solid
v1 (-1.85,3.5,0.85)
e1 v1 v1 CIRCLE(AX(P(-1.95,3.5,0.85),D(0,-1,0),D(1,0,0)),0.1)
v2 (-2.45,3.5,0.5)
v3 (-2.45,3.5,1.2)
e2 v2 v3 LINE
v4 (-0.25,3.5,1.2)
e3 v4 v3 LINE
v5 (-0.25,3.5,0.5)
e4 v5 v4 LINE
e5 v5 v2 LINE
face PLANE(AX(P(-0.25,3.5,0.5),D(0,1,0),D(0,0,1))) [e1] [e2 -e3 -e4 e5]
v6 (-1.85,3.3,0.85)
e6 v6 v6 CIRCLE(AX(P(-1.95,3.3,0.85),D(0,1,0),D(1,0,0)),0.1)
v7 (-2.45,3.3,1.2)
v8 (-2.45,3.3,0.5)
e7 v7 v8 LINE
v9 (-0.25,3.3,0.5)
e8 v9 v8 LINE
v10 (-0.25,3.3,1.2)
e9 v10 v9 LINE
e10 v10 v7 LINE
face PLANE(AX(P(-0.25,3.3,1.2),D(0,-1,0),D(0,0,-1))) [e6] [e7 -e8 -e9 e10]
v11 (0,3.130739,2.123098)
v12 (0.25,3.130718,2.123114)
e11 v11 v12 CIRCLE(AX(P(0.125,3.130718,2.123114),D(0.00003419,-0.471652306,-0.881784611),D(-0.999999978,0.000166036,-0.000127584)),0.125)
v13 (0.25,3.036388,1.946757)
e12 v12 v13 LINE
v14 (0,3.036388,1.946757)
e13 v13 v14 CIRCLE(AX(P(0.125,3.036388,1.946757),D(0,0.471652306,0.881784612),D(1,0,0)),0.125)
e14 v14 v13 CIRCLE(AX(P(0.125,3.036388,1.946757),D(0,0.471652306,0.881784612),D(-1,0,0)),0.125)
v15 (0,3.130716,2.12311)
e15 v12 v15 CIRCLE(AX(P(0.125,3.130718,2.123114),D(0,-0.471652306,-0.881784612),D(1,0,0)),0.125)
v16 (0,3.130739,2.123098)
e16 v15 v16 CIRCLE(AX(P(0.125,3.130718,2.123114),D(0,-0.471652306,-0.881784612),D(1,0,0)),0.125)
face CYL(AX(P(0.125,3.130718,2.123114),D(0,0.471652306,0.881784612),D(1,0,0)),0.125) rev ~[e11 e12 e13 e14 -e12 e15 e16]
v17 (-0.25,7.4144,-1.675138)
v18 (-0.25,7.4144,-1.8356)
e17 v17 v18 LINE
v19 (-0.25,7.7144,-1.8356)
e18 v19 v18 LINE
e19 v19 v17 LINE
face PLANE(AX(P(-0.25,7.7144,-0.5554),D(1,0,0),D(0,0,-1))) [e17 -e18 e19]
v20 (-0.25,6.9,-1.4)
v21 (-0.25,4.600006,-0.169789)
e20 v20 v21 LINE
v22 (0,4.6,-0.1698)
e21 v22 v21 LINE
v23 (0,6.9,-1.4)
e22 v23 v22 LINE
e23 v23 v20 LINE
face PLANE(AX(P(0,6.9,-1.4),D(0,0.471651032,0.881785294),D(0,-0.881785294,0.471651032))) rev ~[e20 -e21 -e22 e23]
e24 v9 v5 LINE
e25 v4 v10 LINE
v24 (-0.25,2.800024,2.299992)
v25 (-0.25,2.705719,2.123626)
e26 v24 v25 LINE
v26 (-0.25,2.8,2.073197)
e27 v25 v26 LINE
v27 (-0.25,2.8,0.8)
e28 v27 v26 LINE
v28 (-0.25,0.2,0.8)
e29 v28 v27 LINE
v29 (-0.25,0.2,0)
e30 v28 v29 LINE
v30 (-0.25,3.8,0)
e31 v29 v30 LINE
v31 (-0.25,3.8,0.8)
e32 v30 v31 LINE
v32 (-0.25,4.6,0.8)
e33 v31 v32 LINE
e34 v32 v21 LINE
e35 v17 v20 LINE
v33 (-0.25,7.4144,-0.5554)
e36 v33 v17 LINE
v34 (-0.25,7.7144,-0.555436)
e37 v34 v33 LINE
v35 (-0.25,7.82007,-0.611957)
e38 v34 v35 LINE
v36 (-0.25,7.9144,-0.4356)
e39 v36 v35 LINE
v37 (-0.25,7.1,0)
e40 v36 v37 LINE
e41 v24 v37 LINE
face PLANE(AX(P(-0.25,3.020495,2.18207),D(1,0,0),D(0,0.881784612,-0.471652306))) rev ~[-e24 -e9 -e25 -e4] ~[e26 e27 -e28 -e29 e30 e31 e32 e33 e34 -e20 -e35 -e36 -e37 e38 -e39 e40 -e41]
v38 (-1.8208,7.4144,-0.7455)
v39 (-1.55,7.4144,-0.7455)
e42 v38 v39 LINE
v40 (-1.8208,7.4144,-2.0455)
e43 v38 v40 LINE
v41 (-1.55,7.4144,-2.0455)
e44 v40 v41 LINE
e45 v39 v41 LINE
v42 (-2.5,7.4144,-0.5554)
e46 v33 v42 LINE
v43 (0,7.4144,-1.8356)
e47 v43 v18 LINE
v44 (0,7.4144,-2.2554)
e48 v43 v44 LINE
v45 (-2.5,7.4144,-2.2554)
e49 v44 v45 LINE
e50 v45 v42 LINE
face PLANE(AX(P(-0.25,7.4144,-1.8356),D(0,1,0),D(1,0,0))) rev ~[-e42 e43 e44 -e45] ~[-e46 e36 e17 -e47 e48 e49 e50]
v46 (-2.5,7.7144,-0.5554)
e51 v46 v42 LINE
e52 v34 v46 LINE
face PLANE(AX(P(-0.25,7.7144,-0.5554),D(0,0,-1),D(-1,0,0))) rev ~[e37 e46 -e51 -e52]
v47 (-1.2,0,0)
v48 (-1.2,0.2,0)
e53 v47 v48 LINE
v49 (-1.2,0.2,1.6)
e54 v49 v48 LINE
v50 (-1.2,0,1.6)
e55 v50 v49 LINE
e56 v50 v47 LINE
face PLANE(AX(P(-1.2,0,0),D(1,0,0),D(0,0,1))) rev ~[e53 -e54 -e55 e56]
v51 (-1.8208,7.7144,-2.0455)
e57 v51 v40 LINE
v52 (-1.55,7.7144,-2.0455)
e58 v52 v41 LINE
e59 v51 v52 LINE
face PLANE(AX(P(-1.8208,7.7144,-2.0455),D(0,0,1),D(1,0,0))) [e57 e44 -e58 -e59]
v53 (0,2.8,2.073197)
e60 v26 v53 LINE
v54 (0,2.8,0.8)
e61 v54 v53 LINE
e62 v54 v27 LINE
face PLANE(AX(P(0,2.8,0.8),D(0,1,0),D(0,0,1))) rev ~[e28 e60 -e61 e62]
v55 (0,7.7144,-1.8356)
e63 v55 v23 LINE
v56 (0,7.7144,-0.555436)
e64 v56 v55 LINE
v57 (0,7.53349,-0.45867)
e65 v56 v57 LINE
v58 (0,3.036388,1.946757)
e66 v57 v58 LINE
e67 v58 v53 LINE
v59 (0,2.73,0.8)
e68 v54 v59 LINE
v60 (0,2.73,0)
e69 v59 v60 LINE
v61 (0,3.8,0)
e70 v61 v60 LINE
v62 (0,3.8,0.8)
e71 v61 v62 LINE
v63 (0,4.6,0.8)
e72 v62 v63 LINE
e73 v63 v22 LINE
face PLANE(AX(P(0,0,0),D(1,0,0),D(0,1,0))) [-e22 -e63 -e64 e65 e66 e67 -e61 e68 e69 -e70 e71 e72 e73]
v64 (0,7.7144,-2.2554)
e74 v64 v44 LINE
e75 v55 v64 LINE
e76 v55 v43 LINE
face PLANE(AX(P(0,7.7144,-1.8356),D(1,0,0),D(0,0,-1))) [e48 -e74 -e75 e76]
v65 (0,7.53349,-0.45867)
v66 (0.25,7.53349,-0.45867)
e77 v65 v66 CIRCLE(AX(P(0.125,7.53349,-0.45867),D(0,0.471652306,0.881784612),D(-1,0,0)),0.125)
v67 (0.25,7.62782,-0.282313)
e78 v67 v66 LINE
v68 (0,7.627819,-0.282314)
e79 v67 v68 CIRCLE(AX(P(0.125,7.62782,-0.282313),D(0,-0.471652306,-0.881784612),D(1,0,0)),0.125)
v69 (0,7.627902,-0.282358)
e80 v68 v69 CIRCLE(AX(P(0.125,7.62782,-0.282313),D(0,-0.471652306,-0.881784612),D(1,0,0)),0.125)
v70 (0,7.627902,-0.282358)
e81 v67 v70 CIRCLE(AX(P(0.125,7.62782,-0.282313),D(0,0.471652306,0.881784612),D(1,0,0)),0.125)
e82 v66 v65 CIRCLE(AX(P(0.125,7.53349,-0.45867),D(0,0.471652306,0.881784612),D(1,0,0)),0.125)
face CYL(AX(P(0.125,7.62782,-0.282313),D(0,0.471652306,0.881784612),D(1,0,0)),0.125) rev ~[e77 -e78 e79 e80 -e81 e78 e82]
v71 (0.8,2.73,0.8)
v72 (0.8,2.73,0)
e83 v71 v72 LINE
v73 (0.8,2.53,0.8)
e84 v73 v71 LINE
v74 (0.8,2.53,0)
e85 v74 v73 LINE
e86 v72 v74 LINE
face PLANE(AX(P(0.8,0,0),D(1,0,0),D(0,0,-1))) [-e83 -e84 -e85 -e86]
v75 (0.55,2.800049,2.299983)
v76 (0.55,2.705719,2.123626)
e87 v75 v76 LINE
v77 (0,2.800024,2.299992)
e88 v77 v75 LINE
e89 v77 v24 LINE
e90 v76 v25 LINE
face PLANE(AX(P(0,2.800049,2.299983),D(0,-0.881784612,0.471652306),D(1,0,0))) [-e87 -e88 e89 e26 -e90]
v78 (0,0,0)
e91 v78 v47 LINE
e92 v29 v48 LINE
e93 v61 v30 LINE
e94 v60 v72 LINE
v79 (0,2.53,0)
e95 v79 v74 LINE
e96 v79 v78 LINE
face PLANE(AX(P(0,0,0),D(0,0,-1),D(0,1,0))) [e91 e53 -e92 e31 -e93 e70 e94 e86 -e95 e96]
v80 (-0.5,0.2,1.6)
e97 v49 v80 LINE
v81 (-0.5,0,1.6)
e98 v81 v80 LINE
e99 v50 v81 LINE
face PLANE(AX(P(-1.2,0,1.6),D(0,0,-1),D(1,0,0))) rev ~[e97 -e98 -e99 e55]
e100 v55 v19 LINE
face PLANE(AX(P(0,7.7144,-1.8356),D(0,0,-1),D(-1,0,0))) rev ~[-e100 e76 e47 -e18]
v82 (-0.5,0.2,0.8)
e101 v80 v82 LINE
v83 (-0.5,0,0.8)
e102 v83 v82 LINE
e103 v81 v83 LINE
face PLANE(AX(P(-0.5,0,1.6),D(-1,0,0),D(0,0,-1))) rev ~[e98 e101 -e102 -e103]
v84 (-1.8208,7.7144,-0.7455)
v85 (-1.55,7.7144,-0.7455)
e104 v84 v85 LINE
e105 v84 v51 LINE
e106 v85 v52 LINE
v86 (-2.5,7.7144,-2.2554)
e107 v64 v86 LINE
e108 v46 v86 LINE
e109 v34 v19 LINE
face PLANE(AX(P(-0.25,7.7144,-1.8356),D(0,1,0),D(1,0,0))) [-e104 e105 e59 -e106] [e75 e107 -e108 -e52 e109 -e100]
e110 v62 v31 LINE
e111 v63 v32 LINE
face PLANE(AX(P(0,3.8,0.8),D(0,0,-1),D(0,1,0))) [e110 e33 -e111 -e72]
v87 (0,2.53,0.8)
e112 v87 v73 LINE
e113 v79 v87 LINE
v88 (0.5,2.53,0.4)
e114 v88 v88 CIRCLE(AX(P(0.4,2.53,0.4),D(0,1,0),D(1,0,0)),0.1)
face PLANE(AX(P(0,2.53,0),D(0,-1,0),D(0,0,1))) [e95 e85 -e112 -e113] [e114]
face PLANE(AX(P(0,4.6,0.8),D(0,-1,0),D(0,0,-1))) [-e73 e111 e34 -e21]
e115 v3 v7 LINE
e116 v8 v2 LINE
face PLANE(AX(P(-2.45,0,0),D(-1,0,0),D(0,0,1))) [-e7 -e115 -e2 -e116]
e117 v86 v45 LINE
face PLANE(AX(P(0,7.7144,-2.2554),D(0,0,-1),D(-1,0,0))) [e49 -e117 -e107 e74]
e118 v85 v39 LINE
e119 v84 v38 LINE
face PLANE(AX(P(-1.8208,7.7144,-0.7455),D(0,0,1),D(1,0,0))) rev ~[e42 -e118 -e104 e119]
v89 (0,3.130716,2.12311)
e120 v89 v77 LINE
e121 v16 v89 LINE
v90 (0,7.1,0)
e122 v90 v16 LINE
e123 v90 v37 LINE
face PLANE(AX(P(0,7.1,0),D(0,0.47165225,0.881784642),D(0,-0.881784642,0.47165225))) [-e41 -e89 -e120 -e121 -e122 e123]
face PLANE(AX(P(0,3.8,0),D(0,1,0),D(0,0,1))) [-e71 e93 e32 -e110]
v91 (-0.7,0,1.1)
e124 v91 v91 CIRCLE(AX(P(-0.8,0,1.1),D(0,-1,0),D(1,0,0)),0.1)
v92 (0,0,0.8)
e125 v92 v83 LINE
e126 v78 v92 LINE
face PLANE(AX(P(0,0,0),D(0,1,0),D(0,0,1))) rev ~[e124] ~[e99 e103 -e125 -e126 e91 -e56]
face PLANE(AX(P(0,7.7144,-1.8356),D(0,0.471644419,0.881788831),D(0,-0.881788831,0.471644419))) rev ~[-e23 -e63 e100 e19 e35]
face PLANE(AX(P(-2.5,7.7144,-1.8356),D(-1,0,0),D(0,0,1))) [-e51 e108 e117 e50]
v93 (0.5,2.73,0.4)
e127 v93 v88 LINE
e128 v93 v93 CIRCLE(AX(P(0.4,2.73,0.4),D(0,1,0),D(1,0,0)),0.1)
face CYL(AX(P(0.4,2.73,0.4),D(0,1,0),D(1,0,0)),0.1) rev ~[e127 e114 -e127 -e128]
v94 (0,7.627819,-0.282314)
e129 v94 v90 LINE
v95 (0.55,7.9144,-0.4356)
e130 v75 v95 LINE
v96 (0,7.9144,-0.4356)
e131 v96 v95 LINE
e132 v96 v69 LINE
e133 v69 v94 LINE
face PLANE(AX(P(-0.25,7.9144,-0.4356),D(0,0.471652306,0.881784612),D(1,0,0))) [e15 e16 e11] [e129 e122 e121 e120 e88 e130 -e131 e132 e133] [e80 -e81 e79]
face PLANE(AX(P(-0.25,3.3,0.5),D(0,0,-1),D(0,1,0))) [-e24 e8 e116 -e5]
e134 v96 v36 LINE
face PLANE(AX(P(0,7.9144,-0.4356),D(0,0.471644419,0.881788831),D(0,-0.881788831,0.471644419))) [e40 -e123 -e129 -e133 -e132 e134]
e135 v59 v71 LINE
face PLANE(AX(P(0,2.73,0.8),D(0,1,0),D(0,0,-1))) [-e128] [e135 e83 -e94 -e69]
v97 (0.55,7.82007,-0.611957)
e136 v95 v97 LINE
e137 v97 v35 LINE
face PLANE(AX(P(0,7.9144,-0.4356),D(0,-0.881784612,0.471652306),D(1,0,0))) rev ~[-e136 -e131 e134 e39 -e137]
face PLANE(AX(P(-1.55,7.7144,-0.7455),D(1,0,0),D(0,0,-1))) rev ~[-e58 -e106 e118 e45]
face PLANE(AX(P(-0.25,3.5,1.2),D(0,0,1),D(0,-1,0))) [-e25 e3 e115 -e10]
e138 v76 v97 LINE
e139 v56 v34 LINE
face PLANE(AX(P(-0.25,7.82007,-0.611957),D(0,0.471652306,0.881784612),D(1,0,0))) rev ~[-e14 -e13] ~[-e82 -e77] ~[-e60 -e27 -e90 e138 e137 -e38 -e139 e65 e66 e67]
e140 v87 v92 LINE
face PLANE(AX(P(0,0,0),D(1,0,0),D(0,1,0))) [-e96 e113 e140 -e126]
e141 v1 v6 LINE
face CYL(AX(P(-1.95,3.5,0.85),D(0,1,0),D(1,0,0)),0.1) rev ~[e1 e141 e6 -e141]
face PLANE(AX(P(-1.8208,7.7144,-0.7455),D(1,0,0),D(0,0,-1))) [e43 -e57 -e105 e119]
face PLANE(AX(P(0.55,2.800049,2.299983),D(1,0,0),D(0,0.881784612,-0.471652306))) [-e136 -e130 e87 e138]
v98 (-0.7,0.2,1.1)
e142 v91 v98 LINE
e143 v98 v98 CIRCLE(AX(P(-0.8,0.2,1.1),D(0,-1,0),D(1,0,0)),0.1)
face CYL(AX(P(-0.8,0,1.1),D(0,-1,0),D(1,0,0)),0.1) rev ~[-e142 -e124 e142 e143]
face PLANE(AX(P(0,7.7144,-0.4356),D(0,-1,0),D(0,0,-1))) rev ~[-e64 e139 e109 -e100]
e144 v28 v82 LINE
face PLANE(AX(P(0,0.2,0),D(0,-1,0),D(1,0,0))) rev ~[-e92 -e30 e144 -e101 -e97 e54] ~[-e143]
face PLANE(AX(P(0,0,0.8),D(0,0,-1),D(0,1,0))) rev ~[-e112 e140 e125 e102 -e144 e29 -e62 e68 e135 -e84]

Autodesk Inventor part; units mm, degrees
ref_plane "YZ Plane" through (0, 0, 0) normal (1, 0, 0) x (0, 1, 0)
ref_plane "XZ Plane" through (0, 0, 0) normal (0, 1, 0) x (-1, 0, 0)
ref_plane "XY Plane" through (0, 0, 0) normal (0, 0, 1) x (1, 0, 0)
sketch "Boceto1" plane through (0, 0, 0) normal (1, 0, 0) x (0, 1, 0)
  line L0 (0, 0) -> (0, 0.8)
  line L1 (0, 0) -> (2.8, 0)
  line L2 (2.8, 0.8) -> (2.8, 2.3)
  line L3 (0, 0.8) -> (2.8, 0.8)
  line L4 (2.8, 0) -> (3.8, 0)
  line L5 (2.8, 0) -> (4.2826, 0)
  line L6 (7.1, 0) -> (2.8, 2.3)
  line L7 (7.9144, -0.4356) -> (7.1, 0)
  line L8 (7.9144, -0.4356) -> (7.7144, -0.4356)
  line L9 (7.7144, -0.4356) -> (7.7144, -1.8356)
  line L10 (7.7144, -1.8356) -> (6.9, -1.4)
  line L11 (6.9, -1.4) -> (4.2826, 0)
  line L12 (2.8, 2.3) -> (2.8, 0.8)
  line L13 (2.8, 0.8) -> (0, 0.8)
  line L14 (0, 0.8) -> (0, 0)
  line L15 (0, 0) -> (4.2826, 0)
  line L16 (4.2826, 0) -> (7.7144, -1.8356)
  line L17 (7.7144, -1.8356) -> (7.7144, -0.4356)
  line L18 (7.7144, -0.4356) -> (7.9144, -0.4356)
  line L19 (7.9144, -0.4356) -> (2.8, 2.3)
  line L20 (2.8, 2.3) -> (2.8, 0.8)
  dimension "d0" = 0.8
  dimension "d1" = 2.8
  dimension "d2" = 2.3
  dimension "d3" = 1
  dimension "d5" = 4.3
  dimension "d6" = 0.2
  dimension "d7" = 1.4
extrude "Extrusión1" add sketch "Boceto1" against normal blind 0.25
sketch "Boceto2" plane through (0, 0, 0) normal (1, 0, 0) x (0, 0, -1)
  line L0 (0, 0) -> (0, 4.2826) projected
  line L1 (0, 4.2826) -> (1.8356, 7.7144) projected
  line L2 (1.8356, 7.7144) -> (0.4356, 7.7144) projected
  line L3 (0.4356, 7.7144) -> (0.4356, 7.9144) projected
  line L4 (0.4356, 7.9144) -> (-2.3, 2.8) projected
  line L5 (-2.3, 2.8) -> (-0.8, 2.8) projected
  line L6 (-0.8, 2.8) -> (-0.8, 0) projected
  line L7 (-0.8, 0) -> (0, 0) projected
  line L8 (0, 0) -> (0, 2.8)
  line L9 (0, 4.2826) -> (0, 0) projected
  line L10 (0, 3.8) -> (-0.8, 3.8)
  line L11 (-0.8, 3.8) -> (-0.8, 4.6)
  line L12 (-0.8, 4.6) -> (0.1698, 4.6)
  line L13 (0, 3.8) -> (0, 4.2826)
  line L14 (0, 4.2826) -> (0.1698, 4.6)
  line L15 (0, 4.2826) -> (1.8356, 7.7144) projected
  dimension "d10" = 3.8
  dimension "d11" = 0.8
  dimension "d12" = 0.8
extrude "Extrusión2" cut sketch "Boceto2" against normal blind 0.3 contours L10 L11 L12 L1 L0
sketch "Boceto3" plane through (-0.25, 7.9144, -0.4356) normal (0, 0.4716523, 0.8817846) x (1, 0, 0)
  line L0 (0.25, 0) -> (0, 0) projected
  line L1 (0, -5.8) -> (0, 0) projected
  line L2 (0.25, -5.8) -> (0, -5.8) projected
  line L3 (0, -5.8) -> (0.8, -5.8)
  line L4 (0.8, -5.8) -> (0.8, 0)
  line L5 (0, 0) -> (0.8, 0)
  line L6 (0, 0) -> (0, -5.8)
  line L7 (0, -5.8) -> (0, -5.55)
  circle A0 centre (0.375, -5.425) radius 0.125
  line L8 (0.375, -5.3) -> (0.375, -0.45)
  line L9 (0.375, -5.55) -> (0.4814, -5.7157)
  circle A1 centre (0.375, -0.325) radius 0.125
  point P0 (0.25, -7.1842)
  dimension "d15" = 0.8
  dimension "d16" = 0.8
  dimension "d22" = 4.85
extrude "Extrusión3" add sketch "Boceto3" against normal blind 0.2
sketch "Boceto4" plane through (0, 0, 0) normal (0, -1, 0) x (1, 0, 0)
  line L0 (0, 0.8) -> (0, 0) projected
  line L1 (0, 0) -> (-1.2, 0)
  line L2 (-1.2, 0) -> (-1.2, 1.6)
  line L3 (-1.2, 1.6) -> (-0.5, 1.6)
  line L4 (-0.5, 1.6) -> (-0.5, 0.8)
  line L5 (0, 0.8) -> (-0.5, 0.8)
  line L6 (0, 0.8) -> (0, 0)
  line L7 (-1.2, 0) -> (-1.2, 1.1)
  circle A0 centre (-0.8, 1.1) radius 0.1
  line L8 (-0.6809, 1.1) -> (-0.6309, 1.1)
  dimension "d25" = 1.2
  dimension "d26" = 1.6
  dimension "d27" = 0.7
  dimension "d28" = 1.1
  dimension "d58" = 0.05
extrude "Extrusión4" add sketch "Boceto4" against normal blind 0.2
sketch "Boceto5" plane through (-0.25, 0, 0) normal (-1, 0, 0) x (0, 0, 1)
  line L0 (0, 3.8) -> (0, 0.2) projected
  line L1 (0, 0.2) -> (0, 3.5)
  line L2 (0, 3.5) -> (0.5, 3.5)
  line L3 (0.5, 3.5) -> (1.2, 3.5)
  line L4 (1.2, 3.5) -> (1.2, 3.3)
  line L5 (1.2, 3.3) -> (0.5, 3.3)
  line L6 (0.5, 3.3) -> (0.5, 3.5)
  point P0 (0, 0)
  dimension "d33" = 3.3
  dimension "d34" = 0.5
  dimension "d35" = 0.7
  dimension "d36" = 0.2
  dimension "d37" = 0.7
extrude "Extrusión5" add sketch "Boceto5" along normal blind 2.2
sketch "Boceto6" plane through (-0.25, 3.5, 1.2) normal (0, 1, 0) x (1, 0, 0)
  line L0 (0, 0.7) -> (-2.2, 0.7) projected
  line L1 (0, 0.7) -> (0, 0.45)
  line L2 (0, 0.4) -> (0, -0.8732) projected
  line L3 (0, 0.45) -> (-1.7, 0.45)
  circle A0 centre (-1.7, 0.35) radius 0.1
  point P0 (0.25, 1.2)
  dimension "d40" = 0.25
  dimension "d41" = 1.7
extrude "Extrusión6" cut sketch "Boceto6" against normal blind 2.2
sketch "Boceto7" plane through (-0.25, 7.7144, -1.8356) normal (0, 1, 0) x (1, 0, 0)
  line L0 (0, -1.2802) -> (0.25, -1.2802) projected
  line L1 (0.25, 0) -> (0.25, -1.2802) projected
  line L2 (0.25, 0) -> (0, 0) projected
  line L3 (0, -1.2802) -> (0, 0) projected
  line L4 (-2.25, 0) -> (-2.25, -1.2802)
  line L5 (0.25, -1.2802) -> (-2.25, -1.2802)
  line L6 (0.25, -1.2802) -> (0.25, 0)
  line L7 (0.25, 0) -> (0.25, 0.4198)
  line L8 (0.25, 0.4198) -> (-2.25, 0.4198)
  line L9 (-2.25, 0.4198) -> (-2.25, 0)
  line L10 (0.25, 0) -> (0, 0) projected
  point P0 (0.25, -1.8356)
  dimension "d45" = 2.5
  dimension "d66" = 1.7
extrude "Extrusión7" add sketch "Boceto7" against normal blind 0.3 contours L5 L4 L9 L8 L7 L2 L3
sketch "Boceto8" plane through (0, 7.7144, -0.5554) normal (0, 1, 0) x (1, 0, 0)
  line L0 (-0.25, 0) -> (0, 0) projected
  line L1 (0, 1.2802) -> (0, 0) projected
  line L2 (-2.5, 1.7) -> (-2.5, 0) projected
  line L3 (-2.5, 0) -> (-0.25, 0) projected
  line L4 (-1.8208, 0.1901) -> (-1.8208, 1.4901)
  line L5 (-1.8208, 1.4901) -> (-1.55, 1.4901)
  line L6 (-1.8208, 0.1901) -> (-1.55, 0.1901)
  line L7 (-1.55, 0.1901) -> (-1.55, 1.4901)
  line L8 (-1.55, 1.4901) -> (-1.8208, 1.4901)
  line L9 (-1.8208, 1.4901) -> (-1.8208, 0.1901)
  line L10 (0, 1.2802) -> (-0.25, 1.2802) projected
  line L11 (0, 1.7) -> (-2.5, 1.7) projected
  line L12 (0, 1.2802) -> (0, 1.7) projected
  point P0 (0, -0.5554)
  dimension "d67" = 1.3
extrude "Extrusión8" cut sketch "Boceto8" against normal blind 0.3 contours L4 L5 L7 L6
sketch "Boceto9" plane through (0, 0, 0) normal (1, 0, 0) x (0, 0, -1)
  line L0 (-0.8, 0.2) -> (-0.8, 2.8) projected
  line L1 (-0.8, 2.8) -> (-0.8, 2.73)
  line L2 (-0.8, 2.73) -> (0, 2.73)
  line L3 (0, 2.73) -> (0, 2.53)
  line L4 (0, 0) -> (0, 3.8) projected
  line L5 (0, 2.53) -> (-0.8, 2.53)
  line L6 (-0.8, 2.53) -> (-0.8, 2.73)
  dimension "d59" = 0.07
  dimension "d60" = 0.2
extrude "Extrusión9" add sketch "Boceto9" along normal blind 0.8
sketch "Boceto10" plane through (0, 2.73, 0.8) normal (0, 1, 0) x (1, 0, 0)
  line L0 (0.8, 0.8) -> (0.8, 0) projected
  line L1 (0, 0.0002) -> (0, 0.8) projected
  line L2 (0, 0) -> (0.8, 0) projected
  circle A0 centre (0.4, 0.4) radius 0.1
  dimension "d63" = 0.2
extrude "Extrusión10" cut sketch "Boceto10" against normal blind 0.8
properties part number "soportefinalfinal2"
